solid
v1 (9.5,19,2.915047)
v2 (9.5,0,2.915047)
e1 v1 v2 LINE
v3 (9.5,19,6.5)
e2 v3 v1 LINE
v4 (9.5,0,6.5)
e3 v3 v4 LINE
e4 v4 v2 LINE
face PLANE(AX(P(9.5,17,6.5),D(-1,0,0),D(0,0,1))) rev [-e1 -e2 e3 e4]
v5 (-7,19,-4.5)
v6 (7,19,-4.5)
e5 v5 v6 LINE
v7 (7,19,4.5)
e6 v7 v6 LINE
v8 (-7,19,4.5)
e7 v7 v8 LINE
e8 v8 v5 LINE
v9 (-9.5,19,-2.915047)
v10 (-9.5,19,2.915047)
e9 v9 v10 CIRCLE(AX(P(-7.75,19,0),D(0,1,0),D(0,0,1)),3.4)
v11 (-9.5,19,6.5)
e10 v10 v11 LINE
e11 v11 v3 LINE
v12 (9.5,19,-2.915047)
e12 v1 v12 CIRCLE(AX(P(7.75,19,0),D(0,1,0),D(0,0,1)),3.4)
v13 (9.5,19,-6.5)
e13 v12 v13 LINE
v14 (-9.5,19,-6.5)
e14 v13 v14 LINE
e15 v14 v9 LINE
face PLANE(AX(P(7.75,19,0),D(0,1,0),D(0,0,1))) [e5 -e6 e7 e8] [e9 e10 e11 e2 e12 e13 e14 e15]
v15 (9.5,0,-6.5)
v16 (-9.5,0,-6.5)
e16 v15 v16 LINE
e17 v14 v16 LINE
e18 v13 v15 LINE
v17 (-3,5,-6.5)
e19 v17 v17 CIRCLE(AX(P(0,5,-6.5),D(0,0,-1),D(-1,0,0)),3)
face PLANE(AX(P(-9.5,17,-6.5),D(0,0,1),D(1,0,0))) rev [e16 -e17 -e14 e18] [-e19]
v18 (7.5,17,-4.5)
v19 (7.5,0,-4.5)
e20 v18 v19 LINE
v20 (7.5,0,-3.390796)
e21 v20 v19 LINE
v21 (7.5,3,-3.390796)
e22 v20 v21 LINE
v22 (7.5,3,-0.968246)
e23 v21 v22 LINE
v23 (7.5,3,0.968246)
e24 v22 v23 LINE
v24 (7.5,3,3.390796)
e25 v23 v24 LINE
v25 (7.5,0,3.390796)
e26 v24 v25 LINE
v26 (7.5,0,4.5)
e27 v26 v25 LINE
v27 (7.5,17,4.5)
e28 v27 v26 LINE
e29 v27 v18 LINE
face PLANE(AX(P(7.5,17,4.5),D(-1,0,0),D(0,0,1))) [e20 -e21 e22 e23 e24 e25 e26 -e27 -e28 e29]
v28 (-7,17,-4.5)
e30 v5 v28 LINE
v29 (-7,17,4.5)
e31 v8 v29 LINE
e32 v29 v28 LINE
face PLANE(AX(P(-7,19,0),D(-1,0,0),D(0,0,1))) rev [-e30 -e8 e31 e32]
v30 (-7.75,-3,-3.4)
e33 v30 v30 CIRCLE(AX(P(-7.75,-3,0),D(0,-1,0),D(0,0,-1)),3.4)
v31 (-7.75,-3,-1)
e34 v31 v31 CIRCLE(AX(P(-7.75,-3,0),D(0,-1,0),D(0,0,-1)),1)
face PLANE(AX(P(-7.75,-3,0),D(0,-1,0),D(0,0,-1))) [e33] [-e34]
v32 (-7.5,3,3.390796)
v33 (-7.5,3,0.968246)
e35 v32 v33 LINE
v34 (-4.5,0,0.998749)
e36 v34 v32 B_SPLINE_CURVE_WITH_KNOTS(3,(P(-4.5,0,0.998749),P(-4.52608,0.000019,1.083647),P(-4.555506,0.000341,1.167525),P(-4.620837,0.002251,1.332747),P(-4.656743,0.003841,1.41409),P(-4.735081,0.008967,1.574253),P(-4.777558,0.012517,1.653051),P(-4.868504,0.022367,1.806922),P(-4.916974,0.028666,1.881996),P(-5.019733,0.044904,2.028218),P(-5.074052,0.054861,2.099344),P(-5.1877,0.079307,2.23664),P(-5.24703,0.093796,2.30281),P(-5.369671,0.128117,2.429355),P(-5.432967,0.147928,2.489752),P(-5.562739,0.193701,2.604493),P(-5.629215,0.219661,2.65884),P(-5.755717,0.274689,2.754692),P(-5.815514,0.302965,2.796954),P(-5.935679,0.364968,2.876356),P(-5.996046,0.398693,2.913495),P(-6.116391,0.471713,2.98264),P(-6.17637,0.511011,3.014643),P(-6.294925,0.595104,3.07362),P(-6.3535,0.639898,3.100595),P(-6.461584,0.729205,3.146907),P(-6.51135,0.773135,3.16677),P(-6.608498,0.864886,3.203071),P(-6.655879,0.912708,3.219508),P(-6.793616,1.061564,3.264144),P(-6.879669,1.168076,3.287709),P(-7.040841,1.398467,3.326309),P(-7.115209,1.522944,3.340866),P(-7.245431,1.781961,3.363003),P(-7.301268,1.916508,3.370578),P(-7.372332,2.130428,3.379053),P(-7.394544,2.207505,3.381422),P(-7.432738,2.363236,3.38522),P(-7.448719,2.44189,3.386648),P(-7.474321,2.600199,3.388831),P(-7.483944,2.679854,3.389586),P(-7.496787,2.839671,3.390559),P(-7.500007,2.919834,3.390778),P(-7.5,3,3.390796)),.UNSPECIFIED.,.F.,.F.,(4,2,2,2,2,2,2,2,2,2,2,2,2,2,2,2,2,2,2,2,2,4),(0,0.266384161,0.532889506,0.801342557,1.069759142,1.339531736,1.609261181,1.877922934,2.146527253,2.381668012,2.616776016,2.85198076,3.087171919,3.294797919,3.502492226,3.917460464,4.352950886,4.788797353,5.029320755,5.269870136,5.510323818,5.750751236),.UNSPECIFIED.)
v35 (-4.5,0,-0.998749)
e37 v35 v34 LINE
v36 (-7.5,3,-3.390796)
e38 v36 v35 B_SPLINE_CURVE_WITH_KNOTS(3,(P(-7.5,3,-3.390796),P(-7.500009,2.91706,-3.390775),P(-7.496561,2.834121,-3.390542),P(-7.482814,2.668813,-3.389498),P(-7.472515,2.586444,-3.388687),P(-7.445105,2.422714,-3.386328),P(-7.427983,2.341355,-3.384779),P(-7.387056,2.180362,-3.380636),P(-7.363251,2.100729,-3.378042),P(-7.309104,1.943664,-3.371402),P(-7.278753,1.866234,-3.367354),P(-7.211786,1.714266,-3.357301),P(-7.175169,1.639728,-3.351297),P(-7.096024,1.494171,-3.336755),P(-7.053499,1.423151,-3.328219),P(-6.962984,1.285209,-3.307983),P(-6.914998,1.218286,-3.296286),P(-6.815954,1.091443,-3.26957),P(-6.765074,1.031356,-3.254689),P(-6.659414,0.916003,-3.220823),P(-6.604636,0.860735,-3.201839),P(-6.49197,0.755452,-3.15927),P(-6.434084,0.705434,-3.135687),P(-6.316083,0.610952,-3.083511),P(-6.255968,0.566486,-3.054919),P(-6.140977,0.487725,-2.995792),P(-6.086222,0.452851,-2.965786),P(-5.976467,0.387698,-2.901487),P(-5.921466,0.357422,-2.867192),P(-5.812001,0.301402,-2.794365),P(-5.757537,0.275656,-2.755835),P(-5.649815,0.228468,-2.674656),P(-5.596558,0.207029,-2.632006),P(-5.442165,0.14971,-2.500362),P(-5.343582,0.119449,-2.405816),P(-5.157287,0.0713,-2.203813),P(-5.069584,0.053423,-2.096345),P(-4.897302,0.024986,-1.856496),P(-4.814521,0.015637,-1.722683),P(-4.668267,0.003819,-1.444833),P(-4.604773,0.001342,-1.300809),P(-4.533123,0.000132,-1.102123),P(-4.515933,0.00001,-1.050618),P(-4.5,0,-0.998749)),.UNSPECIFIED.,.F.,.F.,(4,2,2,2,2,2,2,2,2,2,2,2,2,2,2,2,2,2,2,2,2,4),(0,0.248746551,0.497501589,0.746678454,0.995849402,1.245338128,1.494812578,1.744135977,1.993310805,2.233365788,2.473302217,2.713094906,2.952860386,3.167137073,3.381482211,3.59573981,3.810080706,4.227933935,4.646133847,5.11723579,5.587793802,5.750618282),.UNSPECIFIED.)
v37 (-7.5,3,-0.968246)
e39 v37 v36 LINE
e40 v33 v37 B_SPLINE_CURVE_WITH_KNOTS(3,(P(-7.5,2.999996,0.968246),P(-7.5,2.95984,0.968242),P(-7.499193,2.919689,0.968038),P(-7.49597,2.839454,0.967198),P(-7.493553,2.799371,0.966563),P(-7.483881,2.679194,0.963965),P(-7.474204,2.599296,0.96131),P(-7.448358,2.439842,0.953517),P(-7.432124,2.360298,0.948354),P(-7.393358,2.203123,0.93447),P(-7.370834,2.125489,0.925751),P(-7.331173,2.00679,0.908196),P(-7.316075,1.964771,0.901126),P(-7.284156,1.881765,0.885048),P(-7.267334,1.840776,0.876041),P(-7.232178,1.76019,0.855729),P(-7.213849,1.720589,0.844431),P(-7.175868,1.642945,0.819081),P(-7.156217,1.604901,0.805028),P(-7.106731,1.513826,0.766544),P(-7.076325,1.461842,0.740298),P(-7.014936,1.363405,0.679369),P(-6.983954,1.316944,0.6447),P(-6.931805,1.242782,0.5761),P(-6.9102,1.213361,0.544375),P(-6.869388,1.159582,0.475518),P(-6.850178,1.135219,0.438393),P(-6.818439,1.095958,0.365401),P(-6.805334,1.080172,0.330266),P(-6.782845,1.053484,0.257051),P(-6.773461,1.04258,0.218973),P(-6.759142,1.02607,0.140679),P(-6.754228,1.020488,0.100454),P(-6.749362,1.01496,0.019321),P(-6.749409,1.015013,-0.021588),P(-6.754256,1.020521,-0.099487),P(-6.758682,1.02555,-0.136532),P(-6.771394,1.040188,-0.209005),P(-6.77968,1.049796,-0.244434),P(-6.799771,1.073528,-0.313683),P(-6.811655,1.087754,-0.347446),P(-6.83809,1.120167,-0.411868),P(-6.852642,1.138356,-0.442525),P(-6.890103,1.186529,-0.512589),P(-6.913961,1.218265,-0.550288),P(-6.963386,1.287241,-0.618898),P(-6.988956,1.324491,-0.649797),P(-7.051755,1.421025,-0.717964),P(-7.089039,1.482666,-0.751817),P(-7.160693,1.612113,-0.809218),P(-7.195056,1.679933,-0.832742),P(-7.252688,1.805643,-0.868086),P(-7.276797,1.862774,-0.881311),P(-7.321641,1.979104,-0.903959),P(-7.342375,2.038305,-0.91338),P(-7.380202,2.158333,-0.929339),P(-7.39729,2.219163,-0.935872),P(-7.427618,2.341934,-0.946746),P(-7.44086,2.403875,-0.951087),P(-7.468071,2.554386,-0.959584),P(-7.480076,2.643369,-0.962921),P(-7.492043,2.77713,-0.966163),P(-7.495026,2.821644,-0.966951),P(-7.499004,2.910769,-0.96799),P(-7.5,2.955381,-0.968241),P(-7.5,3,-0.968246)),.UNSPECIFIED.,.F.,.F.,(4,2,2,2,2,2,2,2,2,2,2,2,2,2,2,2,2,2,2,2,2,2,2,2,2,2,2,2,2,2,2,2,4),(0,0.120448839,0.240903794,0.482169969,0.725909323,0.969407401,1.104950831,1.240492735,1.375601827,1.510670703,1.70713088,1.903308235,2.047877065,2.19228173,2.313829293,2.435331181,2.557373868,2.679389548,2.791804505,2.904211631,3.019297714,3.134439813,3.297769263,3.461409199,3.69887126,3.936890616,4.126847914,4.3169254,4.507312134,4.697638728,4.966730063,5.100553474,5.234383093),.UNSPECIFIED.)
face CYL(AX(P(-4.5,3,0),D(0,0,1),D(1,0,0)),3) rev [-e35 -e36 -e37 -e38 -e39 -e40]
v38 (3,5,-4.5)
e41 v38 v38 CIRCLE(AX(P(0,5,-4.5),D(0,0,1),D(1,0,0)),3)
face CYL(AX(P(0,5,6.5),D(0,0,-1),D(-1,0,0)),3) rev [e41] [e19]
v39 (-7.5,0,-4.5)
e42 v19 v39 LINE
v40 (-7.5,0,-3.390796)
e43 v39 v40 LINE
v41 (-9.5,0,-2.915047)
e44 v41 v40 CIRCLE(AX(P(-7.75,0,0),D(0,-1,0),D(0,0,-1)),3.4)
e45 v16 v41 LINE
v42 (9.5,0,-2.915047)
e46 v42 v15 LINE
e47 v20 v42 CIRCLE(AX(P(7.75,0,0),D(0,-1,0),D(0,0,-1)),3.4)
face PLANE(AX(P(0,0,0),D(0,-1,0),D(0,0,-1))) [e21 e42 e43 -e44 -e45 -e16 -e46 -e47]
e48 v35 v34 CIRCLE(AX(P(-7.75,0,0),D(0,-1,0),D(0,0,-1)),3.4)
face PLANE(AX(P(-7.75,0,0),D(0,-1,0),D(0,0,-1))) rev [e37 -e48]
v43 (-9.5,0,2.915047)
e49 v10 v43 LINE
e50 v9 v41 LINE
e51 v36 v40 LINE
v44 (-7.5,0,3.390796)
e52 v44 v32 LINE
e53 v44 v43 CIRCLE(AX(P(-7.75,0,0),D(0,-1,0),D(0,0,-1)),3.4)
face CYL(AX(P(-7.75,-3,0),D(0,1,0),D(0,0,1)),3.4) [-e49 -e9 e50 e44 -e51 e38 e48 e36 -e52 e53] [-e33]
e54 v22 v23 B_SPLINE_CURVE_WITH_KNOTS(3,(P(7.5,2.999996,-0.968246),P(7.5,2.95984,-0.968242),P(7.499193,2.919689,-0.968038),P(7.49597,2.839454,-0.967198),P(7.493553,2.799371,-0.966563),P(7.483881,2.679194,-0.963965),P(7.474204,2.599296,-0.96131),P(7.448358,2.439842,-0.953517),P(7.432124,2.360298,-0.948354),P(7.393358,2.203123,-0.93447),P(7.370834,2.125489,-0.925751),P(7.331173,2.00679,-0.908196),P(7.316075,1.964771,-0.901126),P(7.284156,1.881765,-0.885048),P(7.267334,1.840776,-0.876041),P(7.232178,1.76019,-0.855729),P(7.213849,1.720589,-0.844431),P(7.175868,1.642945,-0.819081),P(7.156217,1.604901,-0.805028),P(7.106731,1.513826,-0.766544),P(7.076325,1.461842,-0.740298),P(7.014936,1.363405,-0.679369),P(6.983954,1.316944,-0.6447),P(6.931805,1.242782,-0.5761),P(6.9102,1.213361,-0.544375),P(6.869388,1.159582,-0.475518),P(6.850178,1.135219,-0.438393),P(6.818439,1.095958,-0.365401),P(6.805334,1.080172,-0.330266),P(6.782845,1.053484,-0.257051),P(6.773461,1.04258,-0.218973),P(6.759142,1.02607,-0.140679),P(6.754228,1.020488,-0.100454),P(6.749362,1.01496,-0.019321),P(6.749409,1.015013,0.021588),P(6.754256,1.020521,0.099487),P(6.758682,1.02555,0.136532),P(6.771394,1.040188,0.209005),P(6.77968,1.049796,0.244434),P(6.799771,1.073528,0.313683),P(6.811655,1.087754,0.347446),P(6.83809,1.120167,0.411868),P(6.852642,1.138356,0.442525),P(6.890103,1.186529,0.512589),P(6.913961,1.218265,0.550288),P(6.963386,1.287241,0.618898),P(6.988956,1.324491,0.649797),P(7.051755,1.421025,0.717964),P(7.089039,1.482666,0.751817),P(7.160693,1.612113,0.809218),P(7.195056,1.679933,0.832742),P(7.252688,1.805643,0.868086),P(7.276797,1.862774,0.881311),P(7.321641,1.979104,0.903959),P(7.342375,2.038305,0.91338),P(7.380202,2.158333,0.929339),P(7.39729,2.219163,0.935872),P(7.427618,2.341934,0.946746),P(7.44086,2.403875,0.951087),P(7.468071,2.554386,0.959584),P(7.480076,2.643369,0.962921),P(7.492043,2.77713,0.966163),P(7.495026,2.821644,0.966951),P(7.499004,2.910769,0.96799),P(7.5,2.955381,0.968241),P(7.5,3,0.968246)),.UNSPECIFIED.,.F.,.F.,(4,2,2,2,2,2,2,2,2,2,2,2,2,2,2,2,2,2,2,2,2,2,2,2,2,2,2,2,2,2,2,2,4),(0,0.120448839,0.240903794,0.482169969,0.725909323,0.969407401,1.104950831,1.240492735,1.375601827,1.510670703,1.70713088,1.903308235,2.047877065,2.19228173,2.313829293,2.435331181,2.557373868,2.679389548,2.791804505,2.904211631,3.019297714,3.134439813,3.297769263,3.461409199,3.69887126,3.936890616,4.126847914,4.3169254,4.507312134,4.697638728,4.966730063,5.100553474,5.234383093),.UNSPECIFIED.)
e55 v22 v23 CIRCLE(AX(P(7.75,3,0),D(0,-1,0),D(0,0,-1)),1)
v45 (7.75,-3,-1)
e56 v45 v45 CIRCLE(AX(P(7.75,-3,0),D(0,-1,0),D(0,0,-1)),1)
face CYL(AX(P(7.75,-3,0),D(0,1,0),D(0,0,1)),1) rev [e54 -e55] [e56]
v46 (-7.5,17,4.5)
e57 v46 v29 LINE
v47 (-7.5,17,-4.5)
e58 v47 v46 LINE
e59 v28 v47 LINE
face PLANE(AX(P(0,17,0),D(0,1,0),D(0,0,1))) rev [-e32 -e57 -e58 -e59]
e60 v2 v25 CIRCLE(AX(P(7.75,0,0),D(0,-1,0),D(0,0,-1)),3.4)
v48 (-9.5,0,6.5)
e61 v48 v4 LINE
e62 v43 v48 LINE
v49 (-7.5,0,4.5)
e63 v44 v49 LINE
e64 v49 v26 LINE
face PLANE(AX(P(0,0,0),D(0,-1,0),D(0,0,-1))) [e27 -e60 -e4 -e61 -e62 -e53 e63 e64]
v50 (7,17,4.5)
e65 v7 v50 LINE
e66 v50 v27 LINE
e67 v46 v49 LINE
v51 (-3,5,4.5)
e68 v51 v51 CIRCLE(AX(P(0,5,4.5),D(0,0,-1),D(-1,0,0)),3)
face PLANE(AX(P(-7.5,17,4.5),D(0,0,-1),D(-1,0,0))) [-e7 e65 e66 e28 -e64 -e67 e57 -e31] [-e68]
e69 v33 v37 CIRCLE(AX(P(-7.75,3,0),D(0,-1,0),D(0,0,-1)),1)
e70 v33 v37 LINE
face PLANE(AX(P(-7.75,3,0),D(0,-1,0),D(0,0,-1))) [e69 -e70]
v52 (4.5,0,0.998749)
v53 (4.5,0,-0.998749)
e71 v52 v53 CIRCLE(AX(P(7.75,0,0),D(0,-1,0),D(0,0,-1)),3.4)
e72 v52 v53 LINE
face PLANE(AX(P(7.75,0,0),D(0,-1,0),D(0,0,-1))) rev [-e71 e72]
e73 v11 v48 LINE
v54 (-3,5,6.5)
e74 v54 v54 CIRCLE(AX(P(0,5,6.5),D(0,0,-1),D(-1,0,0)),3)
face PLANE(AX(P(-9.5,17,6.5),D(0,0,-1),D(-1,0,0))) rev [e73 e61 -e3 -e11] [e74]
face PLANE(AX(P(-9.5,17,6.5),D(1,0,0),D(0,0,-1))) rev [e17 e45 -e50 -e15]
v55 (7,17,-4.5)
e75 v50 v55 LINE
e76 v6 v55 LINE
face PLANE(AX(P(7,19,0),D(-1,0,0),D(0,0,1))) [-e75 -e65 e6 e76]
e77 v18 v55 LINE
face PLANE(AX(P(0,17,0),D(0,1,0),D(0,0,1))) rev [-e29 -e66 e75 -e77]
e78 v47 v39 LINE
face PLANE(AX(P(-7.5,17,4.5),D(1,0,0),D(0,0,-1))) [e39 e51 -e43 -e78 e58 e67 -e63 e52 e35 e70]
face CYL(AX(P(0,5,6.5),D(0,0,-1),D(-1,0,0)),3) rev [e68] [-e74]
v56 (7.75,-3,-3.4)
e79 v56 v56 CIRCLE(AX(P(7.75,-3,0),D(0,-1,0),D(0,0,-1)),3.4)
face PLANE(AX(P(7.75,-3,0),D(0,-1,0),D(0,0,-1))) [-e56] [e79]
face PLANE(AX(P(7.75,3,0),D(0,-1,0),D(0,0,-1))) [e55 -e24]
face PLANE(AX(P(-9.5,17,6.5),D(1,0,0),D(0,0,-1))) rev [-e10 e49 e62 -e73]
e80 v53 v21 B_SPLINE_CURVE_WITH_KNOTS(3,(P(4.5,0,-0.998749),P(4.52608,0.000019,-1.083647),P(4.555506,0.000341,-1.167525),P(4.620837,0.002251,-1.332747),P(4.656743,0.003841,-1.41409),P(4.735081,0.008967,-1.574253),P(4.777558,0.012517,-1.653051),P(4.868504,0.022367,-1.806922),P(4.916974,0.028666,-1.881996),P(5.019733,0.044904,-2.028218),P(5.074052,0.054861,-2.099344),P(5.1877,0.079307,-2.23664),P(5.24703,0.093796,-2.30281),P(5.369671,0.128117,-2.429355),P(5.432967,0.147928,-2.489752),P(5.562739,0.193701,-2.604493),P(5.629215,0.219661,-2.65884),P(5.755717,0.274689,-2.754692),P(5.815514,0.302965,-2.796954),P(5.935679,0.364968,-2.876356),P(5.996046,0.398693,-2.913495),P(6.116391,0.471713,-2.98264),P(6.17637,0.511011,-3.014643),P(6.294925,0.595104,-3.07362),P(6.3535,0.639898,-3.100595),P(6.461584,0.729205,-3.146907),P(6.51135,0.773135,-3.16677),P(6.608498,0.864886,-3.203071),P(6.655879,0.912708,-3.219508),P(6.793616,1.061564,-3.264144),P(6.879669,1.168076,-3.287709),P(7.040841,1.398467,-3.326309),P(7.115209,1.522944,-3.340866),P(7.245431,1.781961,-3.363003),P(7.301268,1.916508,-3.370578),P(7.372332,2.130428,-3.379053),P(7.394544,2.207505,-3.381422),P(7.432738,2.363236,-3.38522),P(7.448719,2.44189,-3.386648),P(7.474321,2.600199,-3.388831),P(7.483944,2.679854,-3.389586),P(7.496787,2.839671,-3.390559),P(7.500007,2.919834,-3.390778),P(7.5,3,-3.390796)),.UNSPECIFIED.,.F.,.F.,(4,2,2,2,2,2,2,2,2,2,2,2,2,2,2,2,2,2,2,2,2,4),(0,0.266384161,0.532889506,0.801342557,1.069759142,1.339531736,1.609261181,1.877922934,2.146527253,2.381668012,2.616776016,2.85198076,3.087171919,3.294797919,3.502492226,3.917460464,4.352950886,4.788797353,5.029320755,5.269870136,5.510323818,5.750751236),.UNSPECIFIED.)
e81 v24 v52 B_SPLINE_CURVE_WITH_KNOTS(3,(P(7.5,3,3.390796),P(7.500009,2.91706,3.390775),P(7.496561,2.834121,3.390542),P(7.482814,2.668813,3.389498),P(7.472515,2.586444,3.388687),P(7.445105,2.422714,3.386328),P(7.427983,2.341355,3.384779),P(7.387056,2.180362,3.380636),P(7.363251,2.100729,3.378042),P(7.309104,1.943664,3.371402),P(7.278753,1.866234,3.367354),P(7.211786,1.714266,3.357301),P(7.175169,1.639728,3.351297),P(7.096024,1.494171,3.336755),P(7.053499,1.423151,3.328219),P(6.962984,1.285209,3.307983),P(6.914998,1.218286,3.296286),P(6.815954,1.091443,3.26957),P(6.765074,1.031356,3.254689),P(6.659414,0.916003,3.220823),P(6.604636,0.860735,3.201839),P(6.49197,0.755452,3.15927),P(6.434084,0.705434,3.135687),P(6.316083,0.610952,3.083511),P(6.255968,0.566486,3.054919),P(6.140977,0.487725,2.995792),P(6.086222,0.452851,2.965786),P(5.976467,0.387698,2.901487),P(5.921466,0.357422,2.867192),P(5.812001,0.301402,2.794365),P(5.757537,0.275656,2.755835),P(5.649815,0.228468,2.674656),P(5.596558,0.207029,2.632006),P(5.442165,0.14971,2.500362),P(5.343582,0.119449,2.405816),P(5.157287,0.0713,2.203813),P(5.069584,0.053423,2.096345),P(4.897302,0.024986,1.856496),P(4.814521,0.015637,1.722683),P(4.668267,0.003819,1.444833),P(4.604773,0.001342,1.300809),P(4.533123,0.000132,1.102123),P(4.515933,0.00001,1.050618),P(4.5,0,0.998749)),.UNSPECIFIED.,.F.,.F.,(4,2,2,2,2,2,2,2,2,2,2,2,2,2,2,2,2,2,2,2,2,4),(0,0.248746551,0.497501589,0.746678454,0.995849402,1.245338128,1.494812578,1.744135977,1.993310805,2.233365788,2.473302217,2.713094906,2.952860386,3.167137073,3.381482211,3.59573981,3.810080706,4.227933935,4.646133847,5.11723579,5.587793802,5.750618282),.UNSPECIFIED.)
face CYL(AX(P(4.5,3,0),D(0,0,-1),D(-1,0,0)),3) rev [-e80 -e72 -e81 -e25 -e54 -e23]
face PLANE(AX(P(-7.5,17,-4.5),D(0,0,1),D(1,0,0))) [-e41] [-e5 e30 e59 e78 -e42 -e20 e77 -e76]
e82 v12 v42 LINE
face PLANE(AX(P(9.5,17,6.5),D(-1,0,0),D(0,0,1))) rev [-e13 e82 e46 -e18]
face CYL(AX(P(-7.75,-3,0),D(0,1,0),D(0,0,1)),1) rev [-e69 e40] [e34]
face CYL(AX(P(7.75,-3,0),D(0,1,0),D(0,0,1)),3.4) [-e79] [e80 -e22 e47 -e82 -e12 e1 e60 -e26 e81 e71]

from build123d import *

# Parameters (mm, degrees)
ESBO_O1_W                = 19
ESBO_O1_H                = 13
ESBO_O1_W_2              = 15
ESBO_O1_H_2              = 9
RESSALTO_EXTRUS_O1_DEPTH = 17
ESBO_O2_R                = 3.4
ESBO_O2_R_2              = 1
RESSALTO_EXTRUS_O2_DEPTH = 3
FILETE1_R                = 3
RESSALTO_EXTRUS_O3_START = 19
RESSALTO_EXTRUS_O3_DEPTH = 19
CORTE_EXTRUS_O1_DEPTH    = 26.579728302
ESBO_O5_W                = 0.5
ESBO_O5_H                = 1.584952831
ESBO_O5_W_2              = 2
ESBO_O5_H_2              = 5.830094338
RESSALTO_EXTRUS_O6_DEPTH = 2
CORTE_EXTRUS_O2_START    = -6
ESBO_O7_R                = 1
CORTE_EXTRUS_O2_DEPTH    = 6


with BuildPart() as part:
    # Esboço1 → Ressalto-extrusão1 (new body)
    with BuildSketch(Plane(origin=(0, 0, 0), x_dir=(1, 0, 0), z_dir=(0, 1, 0))):
        Rectangle(ESBO_O1_W, ESBO_O1_H)
        Rectangle(ESBO_O1_W_2, ESBO_O1_H_2, mode=Mode.SUBTRACT)
    extrude(amount=RESSALTO_EXTRUS_O1_DEPTH)

    # Esboço2 → Ressalto-extrusão2 (add)
    # profile 1 of 2: a face of its own
    with BuildSketch(Plane.XZ):
        with Locations(Location((7.75, 0, 0), (0, 0, 94.216730479))):
            Circle(ESBO_O2_R)
        with Locations(Location((7.75, 0, 0), (0, 0, 104.477512186))):
            Circle(ESBO_O2_R_2, mode=Mode.SUBTRACT)
    # profile 2 of 2: a face of its own
    with BuildSketch(Plane.XZ):
        with Locations(Location((-7.75, 0, 0), (0, 0, 85.783269521))):
            Circle(ESBO_O2_R)
        with Locations(Location((-7.75, 0, 0), (0, 0, 75.522487814))):
            Circle(ESBO_O2_R_2, mode=Mode.SUBTRACT)
    extrude(amount=RESSALTO_EXTRUS_O2_DEPTH)

    # Filete1
    # the kernel refuses this fillet: 3 mm, written as the material it adds along each edge
    with BuildSketch(Plane(origin=(-7.5, 0, -6.531754163), x_dir=(0, 1, 0), z_dir=(0, 0, 1))) as filete1_piece_1_section:
        with BuildLine():
            CenterArc((FILETE1_R, -FILETE1_R), FILETE1_R, 90, 90)
            Line((0, -FILETE1_R), (0, 0))
            Line((0, 0), (FILETE1_R, 0))
        make_face()
    filete1_piece_1 = extrude(amount=17.42255053, mode=Mode.PRIVATE)
    filete1_piece_1 = filete1_piece_1 & Plane(origin=(-7.75, 0.863183733, 0), x_dir=(0.07352941176727577, 0, 0.9972930490107501), z_dir=(0, 1, 0)) * Cylinder(3.4, 47, mode=Mode.PRIVATE)
    filete1_piece_1 = filete1_piece_1 - Plane(origin=(-7.75, 0.863183733, 0), x_dir=(0.25000000000118416, 0, 0.9682458365515485), z_dir=(0, 1, 0)) * Cylinder(1, 47, mode=Mode.PRIVATE)
    add(filete1_piece_1)
    with BuildSketch(Plane(origin=(-7.5, 0, -10.890796367), x_dir=(0, 1, 0), z_dir=(0, 0, 1))) as filete1_piece_2_section:
        with BuildLine():
            CenterArc((FILETE1_R, -FILETE1_R), FILETE1_R, 90, 90)
            Line((0, -FILETE1_R), (0, 0))
            Line((0, 0), (FILETE1_R, 0))
        make_face()
    filete1_piece_2 = extrude(amount=17.42255053, mode=Mode.PRIVATE)
    filete1_piece_2 = filete1_piece_2 & Plane(origin=(-7.75, 0.863183733, 0), x_dir=(0.07352941176727577, 0, 0.9972930490107501), z_dir=(0, 1, 0)) * Cylinder(3.4, 47, mode=Mode.PRIVATE)
    filete1_piece_2 = filete1_piece_2 - Plane(origin=(-7.75, 0.863183733, 0), x_dir=(0.25000000000118416, 0, 0.9682458365515485), z_dir=(0, 1, 0)) * Cylinder(1, 47, mode=Mode.PRIVATE)
    add(filete1_piece_2)
    with BuildSketch(Plane(origin=(7.5, 0, 6.531754163), x_dir=(0, 1, 0), z_dir=(0, 0, -1))) as filete1_piece_3_section:
        with BuildLine():
            CenterArc((FILETE1_R, -FILETE1_R), FILETE1_R, 90, 90)
            Line((0, -FILETE1_R), (0, 0))
            Line((0, 0), (FILETE1_R, 0))
        make_face()
    filete1_piece_3 = extrude(amount=17.42255053, mode=Mode.PRIVATE)
    filete1_piece_3 = filete1_piece_3 & Plane(origin=(7.75, 0.863183735, 0), x_dir=(-0.07352941176727565, 0, 0.9972930490107501), z_dir=(0, 1, 0)) * Cylinder(3.4, 47, mode=Mode.PRIVATE)
    filete1_piece_3 = filete1_piece_3 - Plane(origin=(7.75, 0.863183735, 0), x_dir=(-0.25000000000118405, 0, 0.9682458365515485), z_dir=(0, 1, 0)) * Cylinder(1, 47, mode=Mode.PRIVATE)
    add(filete1_piece_3)
    with BuildSketch(Plane(origin=(7.5, 0, 10.890796367), x_dir=(0, 1, 0), z_dir=(0, 0, -1))) as filete1_piece_4_section:
        with BuildLine():
            CenterArc((FILETE1_R, -FILETE1_R), FILETE1_R, 90, 90)
            Line((0, -FILETE1_R), (0, 0))
            Line((0, 0), (FILETE1_R, 0))
        make_face()
    filete1_piece_4 = extrude(amount=17.42255053, mode=Mode.PRIVATE)
    filete1_piece_4 = filete1_piece_4 & Plane(origin=(7.75, 0.863183735, 0), x_dir=(-0.07352941176727565, 0, 0.9972930490107501), z_dir=(0, 1, 0)) * Cylinder(3.4, 47, mode=Mode.PRIVATE)
    filete1_piece_4 = filete1_piece_4 - Plane(origin=(7.75, 0.863183735, 0), x_dir=(-0.25000000000118405, 0, 0.9682458365515485), z_dir=(0, 1, 0)) * Cylinder(1, 47, mode=Mode.PRIVATE)
    add(filete1_piece_4)

    # Esboço3 → Ressalto-extrusão3 (add)
    with BuildSketch(Plane(origin=(0, 0, 0), x_dir=(1, 0, 0), z_dir=(0, 1, 0)).offset(RESSALTO_EXTRUS_O3_START)):
        with BuildLine():
            Line((-9.5, -2.915047169), (-9.5, 2.915047169))
            ThreePointArc((-9.5, 2.915047169), (-11.15, 0), (-9.5, -2.915047169))
        make_face()
        with BuildLine():
            Line((9.5, 2.915047169), (9.5, -2.915047169))
            ThreePointArc((9.5, -2.915047169), (11.15, 0), (9.5, 2.915047169))
        make_face()
    extrude(amount=-RESSALTO_EXTRUS_O3_DEPTH)

    # Esboço6 → Corte-extrusão1 (cut, through all)
    with BuildSketch(Plane(origin=(0, 0, -6.5), x_dir=(-1, 0, 0), z_dir=(0, 0, -1))):
        with BuildLine():
            ThreePointArc((-3, 5), (-2.121320344, 2.878679656), (0, 2))
            Line((0, 2), (0, 5))
            Line((0, 5), (-3, 5))
        make_face()
        with BuildLine():
            Line((0, 5), (0, 2))
            ThreePointArc((0, 2), (2.121320344, 2.878679656), (3, 5))
            ThreePointArc((3, 5), (0, 8), (-3, 5))
            Line((-3, 5), (0, 5))
        make_face()
    extrude(amount=-CORTE_EXTRUS_O1_DEPTH, mode=Mode.SUBTRACT)

    # Esboço5 → Ressalto-extrusão6 (add)
    with BuildSketch(Plane(origin=(0, 17, 0), x_dir=(1, 0, 0), z_dir=(0, 1, 0))):
        Polygon((7.5, -4.5), (7, -4.5), (3, -4.5), (-3, -4.5), (-7, -4.5), (-7.5, -4.5), (-7.5, -2.915047169), (-9.5, -2.915047169), (-9.5, -6.5), (-3, -6.5), (3, -6.5), (9.5, -6.5), (9.5, -2.915047169), (7.5, -2.915047169), align=None)
        with Locations((7.25, -3.707523585)):
            Rectangle(ESBO_O5_W, ESBO_O5_H)
        with Locations((7.25, 3.707523585)):
            Rectangle(ESBO_O5_W, ESBO_O5_H)
        Polygon((3, 4.5), (7, 4.5), (7.5, 4.5), (7.5, 2.915047169), (9.5, 2.915047169), (9.5, 6.5), (3, 6.5), (-3, 6.5), (-9.5, 6.5), (-9.5, 2.915047169), (-7.5, 2.915047169), (-7.5, 4.5), (-7, 4.5), (-3, 4.5), align=None)
        with Locations((-7.25, -3.707523585)):
            Rectangle(ESBO_O5_W, ESBO_O5_H)
        with Locations((-7.25, 3.707523585)):
            Rectangle(ESBO_O5_W, ESBO_O5_H)
        with Locations((8.5, 0)):
            Rectangle(ESBO_O5_W_2, ESBO_O5_H_2)
        with Locations((-8.5, 0)):
            Rectangle(ESBO_O5_W_2, ESBO_O5_H_2)
        with Locations((-7.25, 0)):
            Rectangle(ESBO_O5_W, ESBO_O5_H_2)
        with Locations((7.25, 0)):
            Rectangle(ESBO_O5_W, ESBO_O5_H_2)
    extrude(amount=RESSALTO_EXTRUS_O6_DEPTH)

    # Esboço7 → Corte-extrusão2 (cut)
    with BuildSketch(Plane.XZ.offset(3).offset(CORTE_EXTRUS_O2_START)):
        with Locations(Location((-7.75, 0, 0), (0, 0, 75.522487814))):
            Circle(ESBO_O7_R)
        with Locations(Location((7.75, 0, 0), (0, 0, 104.477512186))):
            Circle(ESBO_O7_R)
    extrude(amount=CORTE_EXTRUS_O2_DEPTH, mode=Mode.SUBTRACT)


solid = part.part
